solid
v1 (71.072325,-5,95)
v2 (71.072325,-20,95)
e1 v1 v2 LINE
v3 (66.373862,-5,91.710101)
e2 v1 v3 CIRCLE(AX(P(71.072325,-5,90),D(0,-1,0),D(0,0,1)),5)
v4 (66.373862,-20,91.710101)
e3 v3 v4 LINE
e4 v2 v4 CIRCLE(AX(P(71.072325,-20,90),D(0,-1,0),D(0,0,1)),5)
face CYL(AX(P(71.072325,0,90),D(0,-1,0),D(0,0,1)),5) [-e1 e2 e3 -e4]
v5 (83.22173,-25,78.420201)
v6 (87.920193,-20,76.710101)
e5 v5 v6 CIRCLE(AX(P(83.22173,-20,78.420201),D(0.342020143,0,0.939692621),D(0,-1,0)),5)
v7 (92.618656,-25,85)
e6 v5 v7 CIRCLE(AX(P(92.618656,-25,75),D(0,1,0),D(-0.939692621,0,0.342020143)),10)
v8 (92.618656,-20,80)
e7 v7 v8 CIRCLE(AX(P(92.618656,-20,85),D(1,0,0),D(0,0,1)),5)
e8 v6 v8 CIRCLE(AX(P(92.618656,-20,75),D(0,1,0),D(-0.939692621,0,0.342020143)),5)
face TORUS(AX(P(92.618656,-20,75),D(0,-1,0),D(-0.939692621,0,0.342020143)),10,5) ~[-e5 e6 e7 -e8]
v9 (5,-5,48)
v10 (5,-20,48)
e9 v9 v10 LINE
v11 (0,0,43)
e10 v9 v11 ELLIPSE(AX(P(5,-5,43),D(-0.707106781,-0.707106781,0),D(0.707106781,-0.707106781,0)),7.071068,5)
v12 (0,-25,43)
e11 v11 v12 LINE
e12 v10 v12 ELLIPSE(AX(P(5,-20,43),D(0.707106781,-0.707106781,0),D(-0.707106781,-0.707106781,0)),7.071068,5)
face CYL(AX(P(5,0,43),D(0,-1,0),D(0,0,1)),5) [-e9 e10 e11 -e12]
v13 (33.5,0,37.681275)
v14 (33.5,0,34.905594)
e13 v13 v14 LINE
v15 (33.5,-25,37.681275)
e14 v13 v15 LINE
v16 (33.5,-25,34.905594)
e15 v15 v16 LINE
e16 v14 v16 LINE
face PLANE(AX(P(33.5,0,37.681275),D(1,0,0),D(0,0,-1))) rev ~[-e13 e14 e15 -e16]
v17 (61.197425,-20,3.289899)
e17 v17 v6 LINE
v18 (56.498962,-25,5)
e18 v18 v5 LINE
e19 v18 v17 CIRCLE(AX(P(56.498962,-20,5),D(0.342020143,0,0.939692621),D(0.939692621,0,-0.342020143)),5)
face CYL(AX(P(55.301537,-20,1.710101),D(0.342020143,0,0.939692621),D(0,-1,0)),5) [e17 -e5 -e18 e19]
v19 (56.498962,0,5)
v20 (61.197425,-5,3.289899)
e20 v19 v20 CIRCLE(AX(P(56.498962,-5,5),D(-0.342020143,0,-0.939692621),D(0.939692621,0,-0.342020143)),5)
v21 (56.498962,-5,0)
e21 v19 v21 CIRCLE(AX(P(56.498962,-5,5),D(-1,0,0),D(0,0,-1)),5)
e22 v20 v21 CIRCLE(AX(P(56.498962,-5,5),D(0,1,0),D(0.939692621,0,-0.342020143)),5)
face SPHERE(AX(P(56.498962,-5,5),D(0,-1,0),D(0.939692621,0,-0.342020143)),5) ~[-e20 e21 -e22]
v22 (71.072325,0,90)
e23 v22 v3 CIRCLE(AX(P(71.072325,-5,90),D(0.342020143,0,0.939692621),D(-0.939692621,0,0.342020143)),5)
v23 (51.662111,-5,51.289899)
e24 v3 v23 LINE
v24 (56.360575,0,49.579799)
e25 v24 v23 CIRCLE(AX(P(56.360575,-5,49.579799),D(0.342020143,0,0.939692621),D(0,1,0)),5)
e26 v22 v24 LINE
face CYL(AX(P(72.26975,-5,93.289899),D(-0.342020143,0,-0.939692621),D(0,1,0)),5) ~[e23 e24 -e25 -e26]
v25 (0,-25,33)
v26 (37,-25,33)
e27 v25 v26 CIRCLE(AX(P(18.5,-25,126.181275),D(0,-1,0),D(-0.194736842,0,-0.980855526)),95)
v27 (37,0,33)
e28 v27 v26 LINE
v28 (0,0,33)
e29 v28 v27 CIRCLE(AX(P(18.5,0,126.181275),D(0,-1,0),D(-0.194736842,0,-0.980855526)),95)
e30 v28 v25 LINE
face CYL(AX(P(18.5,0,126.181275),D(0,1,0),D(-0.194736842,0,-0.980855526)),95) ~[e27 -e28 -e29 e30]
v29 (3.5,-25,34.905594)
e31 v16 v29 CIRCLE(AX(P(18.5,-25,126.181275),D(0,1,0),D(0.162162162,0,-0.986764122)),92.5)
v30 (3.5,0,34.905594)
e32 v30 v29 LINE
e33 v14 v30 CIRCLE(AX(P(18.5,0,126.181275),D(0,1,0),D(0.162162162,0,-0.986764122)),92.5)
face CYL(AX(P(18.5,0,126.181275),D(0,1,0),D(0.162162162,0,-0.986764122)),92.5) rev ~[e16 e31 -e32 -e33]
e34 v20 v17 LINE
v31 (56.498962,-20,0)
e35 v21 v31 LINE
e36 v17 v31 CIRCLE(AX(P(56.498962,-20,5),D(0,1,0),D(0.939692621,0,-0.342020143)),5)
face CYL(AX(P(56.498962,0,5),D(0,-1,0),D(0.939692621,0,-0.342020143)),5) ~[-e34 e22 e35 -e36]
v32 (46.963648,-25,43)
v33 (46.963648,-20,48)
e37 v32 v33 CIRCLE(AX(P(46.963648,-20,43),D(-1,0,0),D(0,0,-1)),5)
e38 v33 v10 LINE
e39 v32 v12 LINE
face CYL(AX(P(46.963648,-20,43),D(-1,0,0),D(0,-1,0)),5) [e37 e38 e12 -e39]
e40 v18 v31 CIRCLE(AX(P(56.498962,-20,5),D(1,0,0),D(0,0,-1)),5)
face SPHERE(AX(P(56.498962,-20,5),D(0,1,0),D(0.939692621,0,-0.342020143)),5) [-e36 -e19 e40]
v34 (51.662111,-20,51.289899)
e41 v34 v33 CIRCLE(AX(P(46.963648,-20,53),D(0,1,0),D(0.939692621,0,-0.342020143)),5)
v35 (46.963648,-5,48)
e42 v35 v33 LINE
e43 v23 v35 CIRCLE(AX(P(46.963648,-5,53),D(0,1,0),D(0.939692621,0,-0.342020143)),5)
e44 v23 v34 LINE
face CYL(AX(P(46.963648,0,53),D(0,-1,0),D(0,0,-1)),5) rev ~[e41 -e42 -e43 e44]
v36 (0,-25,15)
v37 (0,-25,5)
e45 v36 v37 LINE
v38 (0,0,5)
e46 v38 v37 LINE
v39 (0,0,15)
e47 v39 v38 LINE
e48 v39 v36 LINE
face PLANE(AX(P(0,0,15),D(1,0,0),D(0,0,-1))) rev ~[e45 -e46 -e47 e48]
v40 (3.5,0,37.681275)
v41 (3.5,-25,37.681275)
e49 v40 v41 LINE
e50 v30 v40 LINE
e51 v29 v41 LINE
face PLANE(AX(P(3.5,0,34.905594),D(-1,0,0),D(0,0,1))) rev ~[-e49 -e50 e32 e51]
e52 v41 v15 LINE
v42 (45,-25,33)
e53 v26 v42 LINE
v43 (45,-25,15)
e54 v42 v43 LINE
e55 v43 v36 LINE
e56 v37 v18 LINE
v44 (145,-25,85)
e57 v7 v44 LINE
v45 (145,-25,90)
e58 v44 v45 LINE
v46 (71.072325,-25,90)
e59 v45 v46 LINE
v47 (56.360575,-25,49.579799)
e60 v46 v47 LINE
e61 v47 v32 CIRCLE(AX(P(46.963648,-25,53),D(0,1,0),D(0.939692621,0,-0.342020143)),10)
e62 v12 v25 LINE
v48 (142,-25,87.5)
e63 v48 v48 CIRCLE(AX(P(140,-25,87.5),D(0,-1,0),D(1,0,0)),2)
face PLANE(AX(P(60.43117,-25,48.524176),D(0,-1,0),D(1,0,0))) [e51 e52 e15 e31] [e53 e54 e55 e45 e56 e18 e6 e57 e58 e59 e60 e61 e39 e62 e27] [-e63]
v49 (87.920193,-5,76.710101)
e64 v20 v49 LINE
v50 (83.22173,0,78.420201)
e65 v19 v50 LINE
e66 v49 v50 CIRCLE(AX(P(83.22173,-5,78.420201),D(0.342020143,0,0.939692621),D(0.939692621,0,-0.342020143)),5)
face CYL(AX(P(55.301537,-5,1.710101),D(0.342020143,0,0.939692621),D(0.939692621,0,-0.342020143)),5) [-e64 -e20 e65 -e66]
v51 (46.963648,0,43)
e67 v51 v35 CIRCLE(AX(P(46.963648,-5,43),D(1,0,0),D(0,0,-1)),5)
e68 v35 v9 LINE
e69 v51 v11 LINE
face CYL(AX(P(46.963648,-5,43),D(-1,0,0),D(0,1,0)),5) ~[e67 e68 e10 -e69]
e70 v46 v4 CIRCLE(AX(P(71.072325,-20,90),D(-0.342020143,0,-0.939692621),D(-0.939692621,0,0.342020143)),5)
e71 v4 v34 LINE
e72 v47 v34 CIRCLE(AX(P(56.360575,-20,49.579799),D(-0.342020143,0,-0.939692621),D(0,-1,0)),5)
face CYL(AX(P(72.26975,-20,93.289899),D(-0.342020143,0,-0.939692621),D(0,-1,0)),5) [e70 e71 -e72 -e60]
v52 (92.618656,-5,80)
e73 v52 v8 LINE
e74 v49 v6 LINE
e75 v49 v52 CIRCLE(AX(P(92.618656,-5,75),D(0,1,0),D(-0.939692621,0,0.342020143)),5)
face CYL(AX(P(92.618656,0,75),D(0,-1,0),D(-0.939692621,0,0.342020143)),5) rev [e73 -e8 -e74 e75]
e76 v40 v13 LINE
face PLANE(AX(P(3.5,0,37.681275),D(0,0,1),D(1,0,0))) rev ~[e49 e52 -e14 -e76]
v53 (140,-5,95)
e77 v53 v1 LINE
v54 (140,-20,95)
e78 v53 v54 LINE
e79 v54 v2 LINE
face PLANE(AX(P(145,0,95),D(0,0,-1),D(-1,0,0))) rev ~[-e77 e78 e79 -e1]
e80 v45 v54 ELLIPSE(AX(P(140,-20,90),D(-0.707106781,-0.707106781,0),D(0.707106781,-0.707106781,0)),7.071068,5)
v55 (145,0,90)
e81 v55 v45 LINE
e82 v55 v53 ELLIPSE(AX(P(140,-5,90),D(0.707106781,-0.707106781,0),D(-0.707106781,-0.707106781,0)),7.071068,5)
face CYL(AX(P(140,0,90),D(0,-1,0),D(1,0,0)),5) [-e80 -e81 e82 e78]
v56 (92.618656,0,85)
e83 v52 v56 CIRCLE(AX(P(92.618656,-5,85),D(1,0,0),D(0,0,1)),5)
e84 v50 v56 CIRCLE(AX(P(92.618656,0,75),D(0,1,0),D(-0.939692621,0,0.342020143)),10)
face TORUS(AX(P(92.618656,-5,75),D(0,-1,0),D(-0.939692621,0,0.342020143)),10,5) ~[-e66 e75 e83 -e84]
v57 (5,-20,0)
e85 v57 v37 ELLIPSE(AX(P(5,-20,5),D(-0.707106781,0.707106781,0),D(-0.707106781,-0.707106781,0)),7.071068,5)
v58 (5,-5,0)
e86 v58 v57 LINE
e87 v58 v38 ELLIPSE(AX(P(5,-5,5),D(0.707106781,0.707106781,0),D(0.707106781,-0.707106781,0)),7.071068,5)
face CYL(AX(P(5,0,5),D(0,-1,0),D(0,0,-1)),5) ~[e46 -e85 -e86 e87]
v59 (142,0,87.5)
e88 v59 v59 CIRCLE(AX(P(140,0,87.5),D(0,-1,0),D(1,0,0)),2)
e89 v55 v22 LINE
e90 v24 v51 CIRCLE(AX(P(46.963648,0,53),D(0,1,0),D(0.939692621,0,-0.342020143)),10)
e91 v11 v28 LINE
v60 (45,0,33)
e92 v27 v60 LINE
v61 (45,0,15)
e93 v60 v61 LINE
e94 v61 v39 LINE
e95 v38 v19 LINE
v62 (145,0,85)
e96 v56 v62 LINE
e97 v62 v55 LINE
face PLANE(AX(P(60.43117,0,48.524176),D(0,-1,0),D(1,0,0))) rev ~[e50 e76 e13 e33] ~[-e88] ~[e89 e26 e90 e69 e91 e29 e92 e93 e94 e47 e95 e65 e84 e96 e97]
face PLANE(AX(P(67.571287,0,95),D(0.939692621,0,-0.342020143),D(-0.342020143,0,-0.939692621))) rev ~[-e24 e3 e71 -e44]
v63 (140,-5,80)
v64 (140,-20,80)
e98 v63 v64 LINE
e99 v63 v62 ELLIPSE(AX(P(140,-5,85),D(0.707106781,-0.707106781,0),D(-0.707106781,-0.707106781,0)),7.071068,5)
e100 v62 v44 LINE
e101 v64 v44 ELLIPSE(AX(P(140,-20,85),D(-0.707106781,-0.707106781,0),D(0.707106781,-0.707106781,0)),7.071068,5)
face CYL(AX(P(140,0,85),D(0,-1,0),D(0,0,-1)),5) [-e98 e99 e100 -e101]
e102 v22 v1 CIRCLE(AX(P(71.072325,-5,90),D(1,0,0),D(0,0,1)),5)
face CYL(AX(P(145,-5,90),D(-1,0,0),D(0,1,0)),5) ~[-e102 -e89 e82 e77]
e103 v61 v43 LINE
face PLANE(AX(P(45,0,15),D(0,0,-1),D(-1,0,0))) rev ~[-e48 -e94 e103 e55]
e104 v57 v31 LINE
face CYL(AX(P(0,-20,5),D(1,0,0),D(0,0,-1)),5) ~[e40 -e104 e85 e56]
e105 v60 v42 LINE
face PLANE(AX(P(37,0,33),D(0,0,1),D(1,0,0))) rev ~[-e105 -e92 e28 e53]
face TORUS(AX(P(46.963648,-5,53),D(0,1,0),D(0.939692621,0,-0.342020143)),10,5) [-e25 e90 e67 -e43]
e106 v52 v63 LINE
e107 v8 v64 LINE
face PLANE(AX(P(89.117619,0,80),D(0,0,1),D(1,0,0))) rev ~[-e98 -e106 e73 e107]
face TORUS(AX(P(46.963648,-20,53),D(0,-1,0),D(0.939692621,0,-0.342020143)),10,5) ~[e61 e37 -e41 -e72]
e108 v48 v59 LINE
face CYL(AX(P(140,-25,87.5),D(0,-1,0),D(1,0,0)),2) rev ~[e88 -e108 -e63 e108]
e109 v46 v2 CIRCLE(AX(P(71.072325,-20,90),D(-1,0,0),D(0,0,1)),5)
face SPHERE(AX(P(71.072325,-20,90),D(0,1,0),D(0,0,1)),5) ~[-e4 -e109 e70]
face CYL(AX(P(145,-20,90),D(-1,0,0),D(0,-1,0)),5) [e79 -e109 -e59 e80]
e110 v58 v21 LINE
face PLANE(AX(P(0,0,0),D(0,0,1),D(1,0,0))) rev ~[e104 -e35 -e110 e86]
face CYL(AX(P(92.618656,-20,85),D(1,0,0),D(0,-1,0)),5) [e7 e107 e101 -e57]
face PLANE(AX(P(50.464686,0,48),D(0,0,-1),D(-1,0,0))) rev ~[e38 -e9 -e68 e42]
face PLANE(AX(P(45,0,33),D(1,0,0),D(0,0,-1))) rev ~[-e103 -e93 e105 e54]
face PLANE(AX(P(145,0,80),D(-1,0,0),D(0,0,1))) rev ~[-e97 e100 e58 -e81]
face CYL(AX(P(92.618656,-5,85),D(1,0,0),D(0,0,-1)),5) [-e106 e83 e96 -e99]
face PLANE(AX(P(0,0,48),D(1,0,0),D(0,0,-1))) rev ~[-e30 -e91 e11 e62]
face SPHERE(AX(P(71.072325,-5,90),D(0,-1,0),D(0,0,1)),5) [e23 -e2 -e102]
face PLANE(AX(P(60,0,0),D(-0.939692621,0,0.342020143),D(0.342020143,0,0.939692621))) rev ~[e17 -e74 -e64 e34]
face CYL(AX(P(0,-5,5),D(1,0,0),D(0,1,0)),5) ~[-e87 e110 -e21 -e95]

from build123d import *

# Parameters (mm, degrees)
F1_DEPTH = 25
F2_F1_R  = 5
F2_F2_R  = 5
F3_R     = 2
F4_DEPTH = 25


with BuildPart() as f1:
    # F0 (on Front) → F1 (new body)
    with BuildSketch(Plane.XZ):
        with BuildLine():
            Line((45, 15), (0, 15))
            Line((0, 15), (0, 0))
            Line((0, 0), (60, 0))
            Line((60, 0), (89.1176187413, 80))
            Line((89.1176187413, 80), (145, 80))
            Line((145, 80), (145, 95))
            Line((145, 95), (67.5712870168, 95))
            Line((67.5712870168, 95), (50.4646860063, 48))
            Line((50.4646860063, 48), (0, 48))
            Line((0, 48), (0, 33))
            ThreePointArc((0, 33), (18.5, 31.181274943), (37, 33))
            Line((37, 33), (45, 33))
            Line((45, 33), (45, 15))
        make_face()
        with BuildLine():
            ThreePointArc((33.5, 34.9055936253), (18.5, 33.681274943), (3.5, 34.9055936253))
            Line((3.5, 34.9055936253), (3.5, 37.681274943))
            Line((3.5, 37.681274943), (33.5, 37.681274943))
            Line((33.5, 37.681274943), (33.5, 34.9055936253))
        make_face(mode=Mode.SUBTRACT)
    extrude(amount=F1_DEPTH)

    # F2: fillet of radius 5 on 16 edges, made by hand

    # F2_f1
    f2_f1_edges = [f1.edges().sort_by_distance(p)[0] for p in [
        (89.1176187413, -12.5, 80),
        (50.4646860063, -12.5, 48),
    ]]
    fillet(f2_f1_edges, radius=F2_F1_R)

    # F2_f2
    f2_f2_edges = [f1.edges().sort_by_distance(p)[0] for p in [
        (60, -12.5, 0),
        (67.5712870168, -12.5, 95),
        (145, -12.5, 95),
        (145, -12.5, 80),
        (0, -12.5, 48),
        (0, -12.5, 0),
        (118.8093282162, -25, 80),
        (73.9600966642, 0, 38.3550503583),
        (106.2856435084, -25, 95),
        (59.616699218, -25, 73.1449496417),
        (106.2856435084, 0, 95),
        (59.616699218, 0, 73.1449496417),
        (30, -25, 0),
        (30, 0, 0),
        (49.831530497, 0, 48.9042397786),
        (49.831530497, -25, 48.9042397786),
        (89.7507742506, 0, 79.0957602214),
        (89.7507742506, -25, 79.0957602214),
    ]]
    fillet(f2_f2_edges, radius=F2_F2_R)

    # F3 (on face) → F4 (cut)
    with BuildSketch(Plane.XZ.offset(25)):
        with Locations((140, 87.5)):
            Circle(F3_R)
    extrude(amount=-F4_DEPTH, mode=Mode.SUBTRACT)


solid = f1.part
